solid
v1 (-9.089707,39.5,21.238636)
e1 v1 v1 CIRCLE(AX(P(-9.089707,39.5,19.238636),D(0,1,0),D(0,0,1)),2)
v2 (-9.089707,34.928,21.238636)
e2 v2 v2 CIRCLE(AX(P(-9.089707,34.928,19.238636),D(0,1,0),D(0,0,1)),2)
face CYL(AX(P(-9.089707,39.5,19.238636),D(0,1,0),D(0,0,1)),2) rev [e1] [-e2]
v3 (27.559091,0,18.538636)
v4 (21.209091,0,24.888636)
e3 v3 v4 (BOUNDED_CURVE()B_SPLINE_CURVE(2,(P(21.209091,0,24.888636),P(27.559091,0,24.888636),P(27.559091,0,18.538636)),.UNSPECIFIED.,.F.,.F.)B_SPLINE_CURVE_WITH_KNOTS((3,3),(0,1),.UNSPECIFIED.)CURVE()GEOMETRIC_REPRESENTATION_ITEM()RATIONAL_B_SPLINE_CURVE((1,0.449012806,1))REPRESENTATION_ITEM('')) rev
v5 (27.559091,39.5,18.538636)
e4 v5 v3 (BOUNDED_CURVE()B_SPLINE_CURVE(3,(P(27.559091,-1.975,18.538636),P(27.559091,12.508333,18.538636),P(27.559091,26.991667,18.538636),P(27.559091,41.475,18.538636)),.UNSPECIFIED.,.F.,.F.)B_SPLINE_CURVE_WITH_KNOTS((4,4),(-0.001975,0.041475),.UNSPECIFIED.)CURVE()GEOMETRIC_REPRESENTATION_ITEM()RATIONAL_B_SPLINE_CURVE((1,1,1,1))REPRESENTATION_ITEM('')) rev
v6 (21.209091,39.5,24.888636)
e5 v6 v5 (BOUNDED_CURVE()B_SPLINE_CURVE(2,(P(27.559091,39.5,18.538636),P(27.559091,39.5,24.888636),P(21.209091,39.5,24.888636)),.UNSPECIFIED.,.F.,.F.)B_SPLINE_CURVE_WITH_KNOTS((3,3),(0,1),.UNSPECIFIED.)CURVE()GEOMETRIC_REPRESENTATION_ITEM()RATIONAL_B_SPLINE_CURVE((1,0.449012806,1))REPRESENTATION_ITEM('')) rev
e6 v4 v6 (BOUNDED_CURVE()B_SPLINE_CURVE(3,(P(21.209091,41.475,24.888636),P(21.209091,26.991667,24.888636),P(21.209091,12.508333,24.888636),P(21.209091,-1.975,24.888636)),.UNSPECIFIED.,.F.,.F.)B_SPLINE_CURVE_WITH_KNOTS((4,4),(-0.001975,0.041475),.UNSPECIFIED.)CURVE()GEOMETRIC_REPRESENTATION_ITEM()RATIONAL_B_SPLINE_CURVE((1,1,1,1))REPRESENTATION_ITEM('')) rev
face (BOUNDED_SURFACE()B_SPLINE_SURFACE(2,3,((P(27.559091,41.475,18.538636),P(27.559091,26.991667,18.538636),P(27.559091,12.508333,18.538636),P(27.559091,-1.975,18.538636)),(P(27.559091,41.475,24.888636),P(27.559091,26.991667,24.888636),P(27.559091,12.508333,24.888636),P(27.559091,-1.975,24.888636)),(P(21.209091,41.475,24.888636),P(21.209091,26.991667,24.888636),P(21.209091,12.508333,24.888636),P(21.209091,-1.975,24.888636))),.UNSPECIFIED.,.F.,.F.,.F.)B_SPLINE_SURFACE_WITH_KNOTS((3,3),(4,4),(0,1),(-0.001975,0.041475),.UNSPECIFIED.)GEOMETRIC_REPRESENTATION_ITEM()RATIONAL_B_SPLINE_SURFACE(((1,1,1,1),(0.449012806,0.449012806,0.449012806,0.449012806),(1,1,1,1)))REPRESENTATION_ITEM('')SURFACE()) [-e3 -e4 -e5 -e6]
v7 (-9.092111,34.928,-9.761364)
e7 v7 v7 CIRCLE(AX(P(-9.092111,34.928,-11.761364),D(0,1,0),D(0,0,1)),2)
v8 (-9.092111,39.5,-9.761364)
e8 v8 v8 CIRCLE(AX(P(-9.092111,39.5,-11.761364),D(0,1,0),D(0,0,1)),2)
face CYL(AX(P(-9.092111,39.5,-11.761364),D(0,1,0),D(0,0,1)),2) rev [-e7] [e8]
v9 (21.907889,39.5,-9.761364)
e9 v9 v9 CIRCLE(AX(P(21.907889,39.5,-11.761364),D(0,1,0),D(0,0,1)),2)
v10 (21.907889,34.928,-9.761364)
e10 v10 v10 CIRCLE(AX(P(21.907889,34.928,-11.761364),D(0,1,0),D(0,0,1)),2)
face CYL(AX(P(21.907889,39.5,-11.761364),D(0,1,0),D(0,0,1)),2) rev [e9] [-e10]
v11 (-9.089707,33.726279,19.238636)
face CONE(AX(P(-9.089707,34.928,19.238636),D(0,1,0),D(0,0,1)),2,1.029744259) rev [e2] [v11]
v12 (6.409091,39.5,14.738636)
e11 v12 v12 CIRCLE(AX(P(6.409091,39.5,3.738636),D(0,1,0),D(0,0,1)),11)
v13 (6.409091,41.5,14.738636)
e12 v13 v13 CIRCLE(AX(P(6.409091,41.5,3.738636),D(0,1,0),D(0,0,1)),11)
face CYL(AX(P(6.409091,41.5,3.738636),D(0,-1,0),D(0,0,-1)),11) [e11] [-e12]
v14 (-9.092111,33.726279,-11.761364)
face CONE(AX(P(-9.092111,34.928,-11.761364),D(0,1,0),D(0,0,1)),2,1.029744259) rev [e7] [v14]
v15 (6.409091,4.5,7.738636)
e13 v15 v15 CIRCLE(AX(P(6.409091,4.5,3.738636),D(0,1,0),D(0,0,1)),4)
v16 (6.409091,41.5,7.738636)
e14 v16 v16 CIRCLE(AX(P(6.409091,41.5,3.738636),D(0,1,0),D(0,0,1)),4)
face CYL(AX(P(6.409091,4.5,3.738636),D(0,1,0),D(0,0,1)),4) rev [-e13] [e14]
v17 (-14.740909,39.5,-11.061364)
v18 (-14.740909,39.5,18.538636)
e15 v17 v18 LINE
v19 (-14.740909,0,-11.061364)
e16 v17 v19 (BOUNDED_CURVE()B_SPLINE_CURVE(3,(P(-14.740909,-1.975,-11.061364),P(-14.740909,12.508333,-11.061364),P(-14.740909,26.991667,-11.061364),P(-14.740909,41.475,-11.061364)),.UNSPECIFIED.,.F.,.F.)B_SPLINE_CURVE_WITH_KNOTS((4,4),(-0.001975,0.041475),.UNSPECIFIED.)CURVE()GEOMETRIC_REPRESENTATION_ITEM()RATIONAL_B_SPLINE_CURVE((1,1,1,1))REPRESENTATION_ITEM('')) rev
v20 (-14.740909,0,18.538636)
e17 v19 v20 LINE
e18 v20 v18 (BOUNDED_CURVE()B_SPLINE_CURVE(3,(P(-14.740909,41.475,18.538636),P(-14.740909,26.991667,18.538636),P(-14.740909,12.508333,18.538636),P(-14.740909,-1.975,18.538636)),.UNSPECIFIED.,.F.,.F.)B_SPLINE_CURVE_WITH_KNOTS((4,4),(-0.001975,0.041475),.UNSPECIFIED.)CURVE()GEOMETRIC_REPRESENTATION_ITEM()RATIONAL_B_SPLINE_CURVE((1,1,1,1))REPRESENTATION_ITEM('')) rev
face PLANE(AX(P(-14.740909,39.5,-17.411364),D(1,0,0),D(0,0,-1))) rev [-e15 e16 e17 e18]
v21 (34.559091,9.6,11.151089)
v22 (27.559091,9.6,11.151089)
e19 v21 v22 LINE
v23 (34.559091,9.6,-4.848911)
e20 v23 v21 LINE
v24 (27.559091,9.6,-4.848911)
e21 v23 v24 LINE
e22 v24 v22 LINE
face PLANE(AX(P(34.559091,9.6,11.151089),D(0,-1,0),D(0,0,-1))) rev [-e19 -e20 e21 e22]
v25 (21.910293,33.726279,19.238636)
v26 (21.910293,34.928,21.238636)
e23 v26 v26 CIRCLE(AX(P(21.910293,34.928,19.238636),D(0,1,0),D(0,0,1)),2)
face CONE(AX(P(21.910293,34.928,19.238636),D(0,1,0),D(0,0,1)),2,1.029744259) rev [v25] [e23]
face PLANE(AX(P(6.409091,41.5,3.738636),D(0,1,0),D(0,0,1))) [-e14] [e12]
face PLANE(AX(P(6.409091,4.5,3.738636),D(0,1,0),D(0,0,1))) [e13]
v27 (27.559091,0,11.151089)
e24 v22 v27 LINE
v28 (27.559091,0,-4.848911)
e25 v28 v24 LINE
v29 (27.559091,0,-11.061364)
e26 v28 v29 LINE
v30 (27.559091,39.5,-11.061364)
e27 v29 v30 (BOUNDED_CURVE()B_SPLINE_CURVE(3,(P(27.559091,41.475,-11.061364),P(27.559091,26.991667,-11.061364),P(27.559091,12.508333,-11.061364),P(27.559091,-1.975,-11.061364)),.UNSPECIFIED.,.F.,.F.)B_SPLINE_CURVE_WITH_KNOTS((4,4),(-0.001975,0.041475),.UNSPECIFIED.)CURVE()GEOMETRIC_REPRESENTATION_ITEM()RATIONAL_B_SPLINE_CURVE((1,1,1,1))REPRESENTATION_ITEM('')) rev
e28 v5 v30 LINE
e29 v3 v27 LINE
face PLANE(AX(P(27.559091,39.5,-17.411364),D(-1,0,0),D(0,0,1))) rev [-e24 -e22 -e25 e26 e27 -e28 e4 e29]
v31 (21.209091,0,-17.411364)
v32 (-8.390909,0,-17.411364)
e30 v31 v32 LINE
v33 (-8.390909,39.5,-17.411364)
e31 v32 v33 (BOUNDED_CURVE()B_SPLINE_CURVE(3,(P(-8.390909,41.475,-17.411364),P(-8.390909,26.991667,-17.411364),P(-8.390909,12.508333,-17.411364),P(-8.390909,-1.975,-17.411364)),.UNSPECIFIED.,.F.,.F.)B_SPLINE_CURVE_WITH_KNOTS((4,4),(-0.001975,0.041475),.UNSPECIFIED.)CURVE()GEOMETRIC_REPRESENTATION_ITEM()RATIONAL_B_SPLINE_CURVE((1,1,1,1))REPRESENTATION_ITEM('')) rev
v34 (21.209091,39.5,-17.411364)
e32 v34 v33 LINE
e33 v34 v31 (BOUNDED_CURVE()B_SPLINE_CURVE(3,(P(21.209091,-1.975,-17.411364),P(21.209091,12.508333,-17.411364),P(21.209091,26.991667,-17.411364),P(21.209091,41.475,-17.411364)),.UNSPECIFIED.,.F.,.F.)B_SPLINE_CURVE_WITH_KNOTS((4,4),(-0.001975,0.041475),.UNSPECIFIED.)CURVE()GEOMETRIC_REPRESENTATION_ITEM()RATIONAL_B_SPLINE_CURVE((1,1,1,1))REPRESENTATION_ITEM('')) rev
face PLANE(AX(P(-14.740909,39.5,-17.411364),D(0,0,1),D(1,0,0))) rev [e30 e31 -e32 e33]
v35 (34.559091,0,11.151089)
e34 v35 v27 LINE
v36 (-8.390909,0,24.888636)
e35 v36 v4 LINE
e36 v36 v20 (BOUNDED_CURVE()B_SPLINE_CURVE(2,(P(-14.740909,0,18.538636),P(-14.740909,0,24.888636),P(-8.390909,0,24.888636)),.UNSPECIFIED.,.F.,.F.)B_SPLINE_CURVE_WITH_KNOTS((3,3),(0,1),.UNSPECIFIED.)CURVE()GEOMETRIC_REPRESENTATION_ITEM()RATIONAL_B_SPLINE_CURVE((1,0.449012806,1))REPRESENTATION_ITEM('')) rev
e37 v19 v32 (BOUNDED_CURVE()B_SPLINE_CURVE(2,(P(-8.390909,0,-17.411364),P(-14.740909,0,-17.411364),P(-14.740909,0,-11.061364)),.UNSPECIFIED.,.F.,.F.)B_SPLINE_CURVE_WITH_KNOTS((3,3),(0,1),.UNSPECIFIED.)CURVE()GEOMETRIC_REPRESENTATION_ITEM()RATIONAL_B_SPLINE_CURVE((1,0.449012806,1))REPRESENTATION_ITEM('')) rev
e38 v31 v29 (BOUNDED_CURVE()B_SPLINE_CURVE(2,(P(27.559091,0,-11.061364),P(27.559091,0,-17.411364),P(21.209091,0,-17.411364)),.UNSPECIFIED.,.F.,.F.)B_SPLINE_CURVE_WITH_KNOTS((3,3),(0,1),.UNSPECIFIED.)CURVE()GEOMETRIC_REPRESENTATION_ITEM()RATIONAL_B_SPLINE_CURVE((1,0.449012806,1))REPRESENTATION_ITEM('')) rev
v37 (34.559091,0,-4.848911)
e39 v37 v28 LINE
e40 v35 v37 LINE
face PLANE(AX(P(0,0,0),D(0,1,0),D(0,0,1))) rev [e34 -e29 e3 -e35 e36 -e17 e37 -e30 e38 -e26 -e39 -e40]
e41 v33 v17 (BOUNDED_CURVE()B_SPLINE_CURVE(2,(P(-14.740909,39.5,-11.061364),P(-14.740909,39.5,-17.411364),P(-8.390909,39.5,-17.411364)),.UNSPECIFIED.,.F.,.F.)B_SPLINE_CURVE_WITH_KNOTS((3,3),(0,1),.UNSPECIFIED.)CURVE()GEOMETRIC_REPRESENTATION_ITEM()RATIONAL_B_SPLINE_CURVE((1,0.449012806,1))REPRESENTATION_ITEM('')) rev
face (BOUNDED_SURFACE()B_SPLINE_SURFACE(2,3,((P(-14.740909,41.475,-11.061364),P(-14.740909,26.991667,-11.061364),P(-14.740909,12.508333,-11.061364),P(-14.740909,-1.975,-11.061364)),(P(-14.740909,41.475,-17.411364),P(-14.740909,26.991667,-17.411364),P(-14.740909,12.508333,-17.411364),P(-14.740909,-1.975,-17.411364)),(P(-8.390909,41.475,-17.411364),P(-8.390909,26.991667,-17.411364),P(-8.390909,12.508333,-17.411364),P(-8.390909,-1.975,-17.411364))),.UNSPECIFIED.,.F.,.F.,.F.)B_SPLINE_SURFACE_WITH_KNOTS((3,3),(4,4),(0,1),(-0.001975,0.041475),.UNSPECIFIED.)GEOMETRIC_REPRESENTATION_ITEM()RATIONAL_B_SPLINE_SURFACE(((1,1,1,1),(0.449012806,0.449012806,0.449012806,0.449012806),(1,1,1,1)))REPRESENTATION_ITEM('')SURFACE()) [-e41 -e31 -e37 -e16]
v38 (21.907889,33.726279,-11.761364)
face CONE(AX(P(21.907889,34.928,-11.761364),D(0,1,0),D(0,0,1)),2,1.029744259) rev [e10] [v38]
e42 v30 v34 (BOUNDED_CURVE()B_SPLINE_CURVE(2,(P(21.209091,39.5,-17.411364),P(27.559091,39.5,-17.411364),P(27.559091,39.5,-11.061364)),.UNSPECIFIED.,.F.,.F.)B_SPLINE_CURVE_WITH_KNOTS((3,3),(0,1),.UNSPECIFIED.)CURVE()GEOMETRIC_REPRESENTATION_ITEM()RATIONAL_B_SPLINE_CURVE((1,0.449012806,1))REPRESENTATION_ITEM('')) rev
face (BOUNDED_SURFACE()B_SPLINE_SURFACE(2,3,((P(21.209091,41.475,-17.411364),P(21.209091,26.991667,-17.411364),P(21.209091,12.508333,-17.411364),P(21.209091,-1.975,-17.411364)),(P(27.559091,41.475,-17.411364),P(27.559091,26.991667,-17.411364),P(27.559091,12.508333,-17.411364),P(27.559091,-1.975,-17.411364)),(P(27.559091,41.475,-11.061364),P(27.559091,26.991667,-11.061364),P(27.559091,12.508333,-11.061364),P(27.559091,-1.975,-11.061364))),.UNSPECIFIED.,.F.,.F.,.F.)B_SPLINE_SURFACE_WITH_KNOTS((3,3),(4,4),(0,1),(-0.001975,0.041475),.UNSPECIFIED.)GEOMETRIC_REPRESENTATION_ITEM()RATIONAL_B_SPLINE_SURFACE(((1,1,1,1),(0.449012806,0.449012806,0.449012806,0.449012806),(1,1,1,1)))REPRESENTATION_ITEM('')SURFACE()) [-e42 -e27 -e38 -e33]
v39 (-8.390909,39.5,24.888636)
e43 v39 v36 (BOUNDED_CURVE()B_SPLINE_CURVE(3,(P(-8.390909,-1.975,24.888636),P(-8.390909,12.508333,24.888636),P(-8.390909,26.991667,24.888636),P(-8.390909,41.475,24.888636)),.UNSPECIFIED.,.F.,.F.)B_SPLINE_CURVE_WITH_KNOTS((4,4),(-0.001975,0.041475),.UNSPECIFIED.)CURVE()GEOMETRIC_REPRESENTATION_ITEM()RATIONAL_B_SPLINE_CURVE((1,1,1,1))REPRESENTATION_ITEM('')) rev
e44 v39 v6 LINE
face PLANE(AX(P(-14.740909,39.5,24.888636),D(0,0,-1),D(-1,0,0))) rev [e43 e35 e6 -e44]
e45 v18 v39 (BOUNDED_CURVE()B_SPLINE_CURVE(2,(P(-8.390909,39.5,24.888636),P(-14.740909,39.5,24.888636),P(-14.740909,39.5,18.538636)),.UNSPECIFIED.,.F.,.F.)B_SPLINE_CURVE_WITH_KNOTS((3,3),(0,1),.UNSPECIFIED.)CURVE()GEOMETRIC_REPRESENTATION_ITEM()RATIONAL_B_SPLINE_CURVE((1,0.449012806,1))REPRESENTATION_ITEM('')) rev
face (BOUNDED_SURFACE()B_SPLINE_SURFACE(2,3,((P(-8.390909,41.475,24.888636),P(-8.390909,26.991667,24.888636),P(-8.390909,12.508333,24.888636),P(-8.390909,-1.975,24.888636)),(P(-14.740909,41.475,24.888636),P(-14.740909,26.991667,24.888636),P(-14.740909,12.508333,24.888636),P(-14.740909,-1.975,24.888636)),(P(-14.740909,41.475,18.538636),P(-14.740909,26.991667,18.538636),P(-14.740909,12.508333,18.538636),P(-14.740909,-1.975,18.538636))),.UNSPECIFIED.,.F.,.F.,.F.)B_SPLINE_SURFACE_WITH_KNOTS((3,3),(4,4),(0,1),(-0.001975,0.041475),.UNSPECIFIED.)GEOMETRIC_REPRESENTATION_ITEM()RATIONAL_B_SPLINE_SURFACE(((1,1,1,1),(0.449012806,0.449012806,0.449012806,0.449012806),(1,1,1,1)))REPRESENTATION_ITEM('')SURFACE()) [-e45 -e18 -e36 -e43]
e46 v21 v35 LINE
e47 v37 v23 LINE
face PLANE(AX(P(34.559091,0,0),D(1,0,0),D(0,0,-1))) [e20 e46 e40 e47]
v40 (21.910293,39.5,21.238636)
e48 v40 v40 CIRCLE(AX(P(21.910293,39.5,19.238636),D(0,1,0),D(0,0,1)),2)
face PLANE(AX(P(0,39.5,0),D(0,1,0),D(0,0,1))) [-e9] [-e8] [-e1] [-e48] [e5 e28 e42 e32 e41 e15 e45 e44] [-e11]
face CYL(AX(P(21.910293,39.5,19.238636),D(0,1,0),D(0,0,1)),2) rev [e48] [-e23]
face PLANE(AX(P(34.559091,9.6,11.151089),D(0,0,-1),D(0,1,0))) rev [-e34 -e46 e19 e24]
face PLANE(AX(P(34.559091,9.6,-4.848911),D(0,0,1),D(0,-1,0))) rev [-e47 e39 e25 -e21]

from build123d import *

# Parameters (mm, degrees)
SKETCH1_W                 = 42.3
SKETCH1_H                 = 42.3
BOSS_EXTRUDE1_DEPTH       = 39.5
SKETCH2_R                 = 11
BOSS_EXTRUDE2_DEPTH       = 2
FILLET1_SIZE              = 6.35
F_4_0MM_DOWEL_HOLE1_D     = 4
F_4_0MM_DOWEL_HOLE1_DEPTH = 4.572
F_4_0MM_DOWEL_HOLE1_TIP   = 1.201721238
SKETCH6_R                 = 4
CUT_EXTRUDE1_DEPTH        = 37
SKETCH7_W                 = 16
SKETCH7_H                 = 9.6
BOSS_EXTRUDE3_DEPTH       = 7


with BuildPart() as part:
    # Sketch1 → Boss-Extrude1 (new body)
    with BuildSketch(Plane(origin=(0, 0, 0), x_dir=(1, 0, 0), z_dir=(0, 1, 0))):
        with Locations((6.409090909, -3.738636364)):
            Rectangle(SKETCH1_W, SKETCH1_H)
    extrude(amount=BOSS_EXTRUDE1_DEPTH)

    # Sketch2 → Boss-Extrude2 (add)
    with BuildSketch(Plane(origin=(0, 39.5, 0), x_dir=(1, 0, 0), z_dir=(0, 1, 0))):
        with Locations(Location((6.409090909, -3.738636364, 0), (0, 0, 270))):
            Circle(SKETCH2_R)
    extrude(amount=BOSS_EXTRUDE2_DEPTH)

    # Fillet1
    # a fillet whose section is not a circle: 6.35 mm, written as the material it takes off along each edge
    with BuildSketch(Plane(origin=(-14.740909091, -15.875, -17.411363636), x_dir=(1, 0, 0), z_dir=(0, 1, 0)), Plane(origin=(-14.740909091, -15.875, 24.888636364), x_dir=(0, 0, -1), z_dir=(0, 1, 0))) as fillet1_piece_1:
        with BuildLine():
            Bezier((FILLET1_SIZE, 0), (0, 0), (0, -FILLET1_SIZE), weights=[1, 0.449012806, 1])
            Line((0, -FILLET1_SIZE), (0, 0))
            Line((0, 0), (FILLET1_SIZE, 0))
        make_face()
    extrude(amount=71.25, mode=Mode.SUBTRACT)
    with BuildSketch(Plane(origin=(27.559090909, -15.875, -17.411363636), x_dir=(-1, 0, 0), z_dir=(0, 1, 0)), Plane(origin=(27.559090909, -15.875, 24.888636364), x_dir=(0, 0, -1), z_dir=(0, 1, 0))) as fillet1_piece_2:
        with BuildLine():
            Bezier((FILLET1_SIZE, 0), (0, 0), (0, FILLET1_SIZE), weights=[1, 0.449012806, 1])
            Line((0, FILLET1_SIZE), (0, 0))
            Line((0, 0), (FILLET1_SIZE, 0))
        make_face()
    extrude(amount=71.25, mode=Mode.SUBTRACT)

    # Ø4.0mm Dowel Hole1
    with Locations(Plane(origin=(0, 39.5, 0), x_dir=(1, 0, 0), z_dir=(0, 1, 0))):
        with Locations((-9.092111006, 11.76136359), (21.907888994, 11.76136359), (21.910292824, -19.238636317), (-9.089707176, -19.23863641)):
            Hole(F_4_0MM_DOWEL_HOLE1_D / 2, depth=F_4_0MM_DOWEL_HOLE1_DEPTH)
            with Locations((0, 0, -(F_4_0MM_DOWEL_HOLE1_DEPTH + F_4_0MM_DOWEL_HOLE1_TIP / 2))):  # 118° drill point
                Cone(0, F_4_0MM_DOWEL_HOLE1_D / 2, F_4_0MM_DOWEL_HOLE1_TIP, mode=Mode.SUBTRACT)

    # Sketch6 → Cut-Extrude1 (cut)
    with BuildSketch(Plane(origin=(0, 41.5, 0), x_dir=(1, 0, 0), z_dir=(0, 1, 0))):
        with Locations(Location((6.409090909, -3.738636364, 0), (0, 0, 270))):
            Circle(SKETCH6_R)
    extrude(amount=-CUT_EXTRUDE1_DEPTH, mode=Mode.SUBTRACT)

    # Sketch7 → Boss-Extrude3 (add)
    with BuildSketch(Plane(origin=(27.559090909, 0, 0), x_dir=(0, 0, -1), z_dir=(1, 0, 0))):
        with Locations((-3.15108899, 4.8)):
            Rectangle(SKETCH7_W, SKETCH7_H)
    extrude(amount=BOSS_EXTRUDE3_DEPTH)


solid = part.part
